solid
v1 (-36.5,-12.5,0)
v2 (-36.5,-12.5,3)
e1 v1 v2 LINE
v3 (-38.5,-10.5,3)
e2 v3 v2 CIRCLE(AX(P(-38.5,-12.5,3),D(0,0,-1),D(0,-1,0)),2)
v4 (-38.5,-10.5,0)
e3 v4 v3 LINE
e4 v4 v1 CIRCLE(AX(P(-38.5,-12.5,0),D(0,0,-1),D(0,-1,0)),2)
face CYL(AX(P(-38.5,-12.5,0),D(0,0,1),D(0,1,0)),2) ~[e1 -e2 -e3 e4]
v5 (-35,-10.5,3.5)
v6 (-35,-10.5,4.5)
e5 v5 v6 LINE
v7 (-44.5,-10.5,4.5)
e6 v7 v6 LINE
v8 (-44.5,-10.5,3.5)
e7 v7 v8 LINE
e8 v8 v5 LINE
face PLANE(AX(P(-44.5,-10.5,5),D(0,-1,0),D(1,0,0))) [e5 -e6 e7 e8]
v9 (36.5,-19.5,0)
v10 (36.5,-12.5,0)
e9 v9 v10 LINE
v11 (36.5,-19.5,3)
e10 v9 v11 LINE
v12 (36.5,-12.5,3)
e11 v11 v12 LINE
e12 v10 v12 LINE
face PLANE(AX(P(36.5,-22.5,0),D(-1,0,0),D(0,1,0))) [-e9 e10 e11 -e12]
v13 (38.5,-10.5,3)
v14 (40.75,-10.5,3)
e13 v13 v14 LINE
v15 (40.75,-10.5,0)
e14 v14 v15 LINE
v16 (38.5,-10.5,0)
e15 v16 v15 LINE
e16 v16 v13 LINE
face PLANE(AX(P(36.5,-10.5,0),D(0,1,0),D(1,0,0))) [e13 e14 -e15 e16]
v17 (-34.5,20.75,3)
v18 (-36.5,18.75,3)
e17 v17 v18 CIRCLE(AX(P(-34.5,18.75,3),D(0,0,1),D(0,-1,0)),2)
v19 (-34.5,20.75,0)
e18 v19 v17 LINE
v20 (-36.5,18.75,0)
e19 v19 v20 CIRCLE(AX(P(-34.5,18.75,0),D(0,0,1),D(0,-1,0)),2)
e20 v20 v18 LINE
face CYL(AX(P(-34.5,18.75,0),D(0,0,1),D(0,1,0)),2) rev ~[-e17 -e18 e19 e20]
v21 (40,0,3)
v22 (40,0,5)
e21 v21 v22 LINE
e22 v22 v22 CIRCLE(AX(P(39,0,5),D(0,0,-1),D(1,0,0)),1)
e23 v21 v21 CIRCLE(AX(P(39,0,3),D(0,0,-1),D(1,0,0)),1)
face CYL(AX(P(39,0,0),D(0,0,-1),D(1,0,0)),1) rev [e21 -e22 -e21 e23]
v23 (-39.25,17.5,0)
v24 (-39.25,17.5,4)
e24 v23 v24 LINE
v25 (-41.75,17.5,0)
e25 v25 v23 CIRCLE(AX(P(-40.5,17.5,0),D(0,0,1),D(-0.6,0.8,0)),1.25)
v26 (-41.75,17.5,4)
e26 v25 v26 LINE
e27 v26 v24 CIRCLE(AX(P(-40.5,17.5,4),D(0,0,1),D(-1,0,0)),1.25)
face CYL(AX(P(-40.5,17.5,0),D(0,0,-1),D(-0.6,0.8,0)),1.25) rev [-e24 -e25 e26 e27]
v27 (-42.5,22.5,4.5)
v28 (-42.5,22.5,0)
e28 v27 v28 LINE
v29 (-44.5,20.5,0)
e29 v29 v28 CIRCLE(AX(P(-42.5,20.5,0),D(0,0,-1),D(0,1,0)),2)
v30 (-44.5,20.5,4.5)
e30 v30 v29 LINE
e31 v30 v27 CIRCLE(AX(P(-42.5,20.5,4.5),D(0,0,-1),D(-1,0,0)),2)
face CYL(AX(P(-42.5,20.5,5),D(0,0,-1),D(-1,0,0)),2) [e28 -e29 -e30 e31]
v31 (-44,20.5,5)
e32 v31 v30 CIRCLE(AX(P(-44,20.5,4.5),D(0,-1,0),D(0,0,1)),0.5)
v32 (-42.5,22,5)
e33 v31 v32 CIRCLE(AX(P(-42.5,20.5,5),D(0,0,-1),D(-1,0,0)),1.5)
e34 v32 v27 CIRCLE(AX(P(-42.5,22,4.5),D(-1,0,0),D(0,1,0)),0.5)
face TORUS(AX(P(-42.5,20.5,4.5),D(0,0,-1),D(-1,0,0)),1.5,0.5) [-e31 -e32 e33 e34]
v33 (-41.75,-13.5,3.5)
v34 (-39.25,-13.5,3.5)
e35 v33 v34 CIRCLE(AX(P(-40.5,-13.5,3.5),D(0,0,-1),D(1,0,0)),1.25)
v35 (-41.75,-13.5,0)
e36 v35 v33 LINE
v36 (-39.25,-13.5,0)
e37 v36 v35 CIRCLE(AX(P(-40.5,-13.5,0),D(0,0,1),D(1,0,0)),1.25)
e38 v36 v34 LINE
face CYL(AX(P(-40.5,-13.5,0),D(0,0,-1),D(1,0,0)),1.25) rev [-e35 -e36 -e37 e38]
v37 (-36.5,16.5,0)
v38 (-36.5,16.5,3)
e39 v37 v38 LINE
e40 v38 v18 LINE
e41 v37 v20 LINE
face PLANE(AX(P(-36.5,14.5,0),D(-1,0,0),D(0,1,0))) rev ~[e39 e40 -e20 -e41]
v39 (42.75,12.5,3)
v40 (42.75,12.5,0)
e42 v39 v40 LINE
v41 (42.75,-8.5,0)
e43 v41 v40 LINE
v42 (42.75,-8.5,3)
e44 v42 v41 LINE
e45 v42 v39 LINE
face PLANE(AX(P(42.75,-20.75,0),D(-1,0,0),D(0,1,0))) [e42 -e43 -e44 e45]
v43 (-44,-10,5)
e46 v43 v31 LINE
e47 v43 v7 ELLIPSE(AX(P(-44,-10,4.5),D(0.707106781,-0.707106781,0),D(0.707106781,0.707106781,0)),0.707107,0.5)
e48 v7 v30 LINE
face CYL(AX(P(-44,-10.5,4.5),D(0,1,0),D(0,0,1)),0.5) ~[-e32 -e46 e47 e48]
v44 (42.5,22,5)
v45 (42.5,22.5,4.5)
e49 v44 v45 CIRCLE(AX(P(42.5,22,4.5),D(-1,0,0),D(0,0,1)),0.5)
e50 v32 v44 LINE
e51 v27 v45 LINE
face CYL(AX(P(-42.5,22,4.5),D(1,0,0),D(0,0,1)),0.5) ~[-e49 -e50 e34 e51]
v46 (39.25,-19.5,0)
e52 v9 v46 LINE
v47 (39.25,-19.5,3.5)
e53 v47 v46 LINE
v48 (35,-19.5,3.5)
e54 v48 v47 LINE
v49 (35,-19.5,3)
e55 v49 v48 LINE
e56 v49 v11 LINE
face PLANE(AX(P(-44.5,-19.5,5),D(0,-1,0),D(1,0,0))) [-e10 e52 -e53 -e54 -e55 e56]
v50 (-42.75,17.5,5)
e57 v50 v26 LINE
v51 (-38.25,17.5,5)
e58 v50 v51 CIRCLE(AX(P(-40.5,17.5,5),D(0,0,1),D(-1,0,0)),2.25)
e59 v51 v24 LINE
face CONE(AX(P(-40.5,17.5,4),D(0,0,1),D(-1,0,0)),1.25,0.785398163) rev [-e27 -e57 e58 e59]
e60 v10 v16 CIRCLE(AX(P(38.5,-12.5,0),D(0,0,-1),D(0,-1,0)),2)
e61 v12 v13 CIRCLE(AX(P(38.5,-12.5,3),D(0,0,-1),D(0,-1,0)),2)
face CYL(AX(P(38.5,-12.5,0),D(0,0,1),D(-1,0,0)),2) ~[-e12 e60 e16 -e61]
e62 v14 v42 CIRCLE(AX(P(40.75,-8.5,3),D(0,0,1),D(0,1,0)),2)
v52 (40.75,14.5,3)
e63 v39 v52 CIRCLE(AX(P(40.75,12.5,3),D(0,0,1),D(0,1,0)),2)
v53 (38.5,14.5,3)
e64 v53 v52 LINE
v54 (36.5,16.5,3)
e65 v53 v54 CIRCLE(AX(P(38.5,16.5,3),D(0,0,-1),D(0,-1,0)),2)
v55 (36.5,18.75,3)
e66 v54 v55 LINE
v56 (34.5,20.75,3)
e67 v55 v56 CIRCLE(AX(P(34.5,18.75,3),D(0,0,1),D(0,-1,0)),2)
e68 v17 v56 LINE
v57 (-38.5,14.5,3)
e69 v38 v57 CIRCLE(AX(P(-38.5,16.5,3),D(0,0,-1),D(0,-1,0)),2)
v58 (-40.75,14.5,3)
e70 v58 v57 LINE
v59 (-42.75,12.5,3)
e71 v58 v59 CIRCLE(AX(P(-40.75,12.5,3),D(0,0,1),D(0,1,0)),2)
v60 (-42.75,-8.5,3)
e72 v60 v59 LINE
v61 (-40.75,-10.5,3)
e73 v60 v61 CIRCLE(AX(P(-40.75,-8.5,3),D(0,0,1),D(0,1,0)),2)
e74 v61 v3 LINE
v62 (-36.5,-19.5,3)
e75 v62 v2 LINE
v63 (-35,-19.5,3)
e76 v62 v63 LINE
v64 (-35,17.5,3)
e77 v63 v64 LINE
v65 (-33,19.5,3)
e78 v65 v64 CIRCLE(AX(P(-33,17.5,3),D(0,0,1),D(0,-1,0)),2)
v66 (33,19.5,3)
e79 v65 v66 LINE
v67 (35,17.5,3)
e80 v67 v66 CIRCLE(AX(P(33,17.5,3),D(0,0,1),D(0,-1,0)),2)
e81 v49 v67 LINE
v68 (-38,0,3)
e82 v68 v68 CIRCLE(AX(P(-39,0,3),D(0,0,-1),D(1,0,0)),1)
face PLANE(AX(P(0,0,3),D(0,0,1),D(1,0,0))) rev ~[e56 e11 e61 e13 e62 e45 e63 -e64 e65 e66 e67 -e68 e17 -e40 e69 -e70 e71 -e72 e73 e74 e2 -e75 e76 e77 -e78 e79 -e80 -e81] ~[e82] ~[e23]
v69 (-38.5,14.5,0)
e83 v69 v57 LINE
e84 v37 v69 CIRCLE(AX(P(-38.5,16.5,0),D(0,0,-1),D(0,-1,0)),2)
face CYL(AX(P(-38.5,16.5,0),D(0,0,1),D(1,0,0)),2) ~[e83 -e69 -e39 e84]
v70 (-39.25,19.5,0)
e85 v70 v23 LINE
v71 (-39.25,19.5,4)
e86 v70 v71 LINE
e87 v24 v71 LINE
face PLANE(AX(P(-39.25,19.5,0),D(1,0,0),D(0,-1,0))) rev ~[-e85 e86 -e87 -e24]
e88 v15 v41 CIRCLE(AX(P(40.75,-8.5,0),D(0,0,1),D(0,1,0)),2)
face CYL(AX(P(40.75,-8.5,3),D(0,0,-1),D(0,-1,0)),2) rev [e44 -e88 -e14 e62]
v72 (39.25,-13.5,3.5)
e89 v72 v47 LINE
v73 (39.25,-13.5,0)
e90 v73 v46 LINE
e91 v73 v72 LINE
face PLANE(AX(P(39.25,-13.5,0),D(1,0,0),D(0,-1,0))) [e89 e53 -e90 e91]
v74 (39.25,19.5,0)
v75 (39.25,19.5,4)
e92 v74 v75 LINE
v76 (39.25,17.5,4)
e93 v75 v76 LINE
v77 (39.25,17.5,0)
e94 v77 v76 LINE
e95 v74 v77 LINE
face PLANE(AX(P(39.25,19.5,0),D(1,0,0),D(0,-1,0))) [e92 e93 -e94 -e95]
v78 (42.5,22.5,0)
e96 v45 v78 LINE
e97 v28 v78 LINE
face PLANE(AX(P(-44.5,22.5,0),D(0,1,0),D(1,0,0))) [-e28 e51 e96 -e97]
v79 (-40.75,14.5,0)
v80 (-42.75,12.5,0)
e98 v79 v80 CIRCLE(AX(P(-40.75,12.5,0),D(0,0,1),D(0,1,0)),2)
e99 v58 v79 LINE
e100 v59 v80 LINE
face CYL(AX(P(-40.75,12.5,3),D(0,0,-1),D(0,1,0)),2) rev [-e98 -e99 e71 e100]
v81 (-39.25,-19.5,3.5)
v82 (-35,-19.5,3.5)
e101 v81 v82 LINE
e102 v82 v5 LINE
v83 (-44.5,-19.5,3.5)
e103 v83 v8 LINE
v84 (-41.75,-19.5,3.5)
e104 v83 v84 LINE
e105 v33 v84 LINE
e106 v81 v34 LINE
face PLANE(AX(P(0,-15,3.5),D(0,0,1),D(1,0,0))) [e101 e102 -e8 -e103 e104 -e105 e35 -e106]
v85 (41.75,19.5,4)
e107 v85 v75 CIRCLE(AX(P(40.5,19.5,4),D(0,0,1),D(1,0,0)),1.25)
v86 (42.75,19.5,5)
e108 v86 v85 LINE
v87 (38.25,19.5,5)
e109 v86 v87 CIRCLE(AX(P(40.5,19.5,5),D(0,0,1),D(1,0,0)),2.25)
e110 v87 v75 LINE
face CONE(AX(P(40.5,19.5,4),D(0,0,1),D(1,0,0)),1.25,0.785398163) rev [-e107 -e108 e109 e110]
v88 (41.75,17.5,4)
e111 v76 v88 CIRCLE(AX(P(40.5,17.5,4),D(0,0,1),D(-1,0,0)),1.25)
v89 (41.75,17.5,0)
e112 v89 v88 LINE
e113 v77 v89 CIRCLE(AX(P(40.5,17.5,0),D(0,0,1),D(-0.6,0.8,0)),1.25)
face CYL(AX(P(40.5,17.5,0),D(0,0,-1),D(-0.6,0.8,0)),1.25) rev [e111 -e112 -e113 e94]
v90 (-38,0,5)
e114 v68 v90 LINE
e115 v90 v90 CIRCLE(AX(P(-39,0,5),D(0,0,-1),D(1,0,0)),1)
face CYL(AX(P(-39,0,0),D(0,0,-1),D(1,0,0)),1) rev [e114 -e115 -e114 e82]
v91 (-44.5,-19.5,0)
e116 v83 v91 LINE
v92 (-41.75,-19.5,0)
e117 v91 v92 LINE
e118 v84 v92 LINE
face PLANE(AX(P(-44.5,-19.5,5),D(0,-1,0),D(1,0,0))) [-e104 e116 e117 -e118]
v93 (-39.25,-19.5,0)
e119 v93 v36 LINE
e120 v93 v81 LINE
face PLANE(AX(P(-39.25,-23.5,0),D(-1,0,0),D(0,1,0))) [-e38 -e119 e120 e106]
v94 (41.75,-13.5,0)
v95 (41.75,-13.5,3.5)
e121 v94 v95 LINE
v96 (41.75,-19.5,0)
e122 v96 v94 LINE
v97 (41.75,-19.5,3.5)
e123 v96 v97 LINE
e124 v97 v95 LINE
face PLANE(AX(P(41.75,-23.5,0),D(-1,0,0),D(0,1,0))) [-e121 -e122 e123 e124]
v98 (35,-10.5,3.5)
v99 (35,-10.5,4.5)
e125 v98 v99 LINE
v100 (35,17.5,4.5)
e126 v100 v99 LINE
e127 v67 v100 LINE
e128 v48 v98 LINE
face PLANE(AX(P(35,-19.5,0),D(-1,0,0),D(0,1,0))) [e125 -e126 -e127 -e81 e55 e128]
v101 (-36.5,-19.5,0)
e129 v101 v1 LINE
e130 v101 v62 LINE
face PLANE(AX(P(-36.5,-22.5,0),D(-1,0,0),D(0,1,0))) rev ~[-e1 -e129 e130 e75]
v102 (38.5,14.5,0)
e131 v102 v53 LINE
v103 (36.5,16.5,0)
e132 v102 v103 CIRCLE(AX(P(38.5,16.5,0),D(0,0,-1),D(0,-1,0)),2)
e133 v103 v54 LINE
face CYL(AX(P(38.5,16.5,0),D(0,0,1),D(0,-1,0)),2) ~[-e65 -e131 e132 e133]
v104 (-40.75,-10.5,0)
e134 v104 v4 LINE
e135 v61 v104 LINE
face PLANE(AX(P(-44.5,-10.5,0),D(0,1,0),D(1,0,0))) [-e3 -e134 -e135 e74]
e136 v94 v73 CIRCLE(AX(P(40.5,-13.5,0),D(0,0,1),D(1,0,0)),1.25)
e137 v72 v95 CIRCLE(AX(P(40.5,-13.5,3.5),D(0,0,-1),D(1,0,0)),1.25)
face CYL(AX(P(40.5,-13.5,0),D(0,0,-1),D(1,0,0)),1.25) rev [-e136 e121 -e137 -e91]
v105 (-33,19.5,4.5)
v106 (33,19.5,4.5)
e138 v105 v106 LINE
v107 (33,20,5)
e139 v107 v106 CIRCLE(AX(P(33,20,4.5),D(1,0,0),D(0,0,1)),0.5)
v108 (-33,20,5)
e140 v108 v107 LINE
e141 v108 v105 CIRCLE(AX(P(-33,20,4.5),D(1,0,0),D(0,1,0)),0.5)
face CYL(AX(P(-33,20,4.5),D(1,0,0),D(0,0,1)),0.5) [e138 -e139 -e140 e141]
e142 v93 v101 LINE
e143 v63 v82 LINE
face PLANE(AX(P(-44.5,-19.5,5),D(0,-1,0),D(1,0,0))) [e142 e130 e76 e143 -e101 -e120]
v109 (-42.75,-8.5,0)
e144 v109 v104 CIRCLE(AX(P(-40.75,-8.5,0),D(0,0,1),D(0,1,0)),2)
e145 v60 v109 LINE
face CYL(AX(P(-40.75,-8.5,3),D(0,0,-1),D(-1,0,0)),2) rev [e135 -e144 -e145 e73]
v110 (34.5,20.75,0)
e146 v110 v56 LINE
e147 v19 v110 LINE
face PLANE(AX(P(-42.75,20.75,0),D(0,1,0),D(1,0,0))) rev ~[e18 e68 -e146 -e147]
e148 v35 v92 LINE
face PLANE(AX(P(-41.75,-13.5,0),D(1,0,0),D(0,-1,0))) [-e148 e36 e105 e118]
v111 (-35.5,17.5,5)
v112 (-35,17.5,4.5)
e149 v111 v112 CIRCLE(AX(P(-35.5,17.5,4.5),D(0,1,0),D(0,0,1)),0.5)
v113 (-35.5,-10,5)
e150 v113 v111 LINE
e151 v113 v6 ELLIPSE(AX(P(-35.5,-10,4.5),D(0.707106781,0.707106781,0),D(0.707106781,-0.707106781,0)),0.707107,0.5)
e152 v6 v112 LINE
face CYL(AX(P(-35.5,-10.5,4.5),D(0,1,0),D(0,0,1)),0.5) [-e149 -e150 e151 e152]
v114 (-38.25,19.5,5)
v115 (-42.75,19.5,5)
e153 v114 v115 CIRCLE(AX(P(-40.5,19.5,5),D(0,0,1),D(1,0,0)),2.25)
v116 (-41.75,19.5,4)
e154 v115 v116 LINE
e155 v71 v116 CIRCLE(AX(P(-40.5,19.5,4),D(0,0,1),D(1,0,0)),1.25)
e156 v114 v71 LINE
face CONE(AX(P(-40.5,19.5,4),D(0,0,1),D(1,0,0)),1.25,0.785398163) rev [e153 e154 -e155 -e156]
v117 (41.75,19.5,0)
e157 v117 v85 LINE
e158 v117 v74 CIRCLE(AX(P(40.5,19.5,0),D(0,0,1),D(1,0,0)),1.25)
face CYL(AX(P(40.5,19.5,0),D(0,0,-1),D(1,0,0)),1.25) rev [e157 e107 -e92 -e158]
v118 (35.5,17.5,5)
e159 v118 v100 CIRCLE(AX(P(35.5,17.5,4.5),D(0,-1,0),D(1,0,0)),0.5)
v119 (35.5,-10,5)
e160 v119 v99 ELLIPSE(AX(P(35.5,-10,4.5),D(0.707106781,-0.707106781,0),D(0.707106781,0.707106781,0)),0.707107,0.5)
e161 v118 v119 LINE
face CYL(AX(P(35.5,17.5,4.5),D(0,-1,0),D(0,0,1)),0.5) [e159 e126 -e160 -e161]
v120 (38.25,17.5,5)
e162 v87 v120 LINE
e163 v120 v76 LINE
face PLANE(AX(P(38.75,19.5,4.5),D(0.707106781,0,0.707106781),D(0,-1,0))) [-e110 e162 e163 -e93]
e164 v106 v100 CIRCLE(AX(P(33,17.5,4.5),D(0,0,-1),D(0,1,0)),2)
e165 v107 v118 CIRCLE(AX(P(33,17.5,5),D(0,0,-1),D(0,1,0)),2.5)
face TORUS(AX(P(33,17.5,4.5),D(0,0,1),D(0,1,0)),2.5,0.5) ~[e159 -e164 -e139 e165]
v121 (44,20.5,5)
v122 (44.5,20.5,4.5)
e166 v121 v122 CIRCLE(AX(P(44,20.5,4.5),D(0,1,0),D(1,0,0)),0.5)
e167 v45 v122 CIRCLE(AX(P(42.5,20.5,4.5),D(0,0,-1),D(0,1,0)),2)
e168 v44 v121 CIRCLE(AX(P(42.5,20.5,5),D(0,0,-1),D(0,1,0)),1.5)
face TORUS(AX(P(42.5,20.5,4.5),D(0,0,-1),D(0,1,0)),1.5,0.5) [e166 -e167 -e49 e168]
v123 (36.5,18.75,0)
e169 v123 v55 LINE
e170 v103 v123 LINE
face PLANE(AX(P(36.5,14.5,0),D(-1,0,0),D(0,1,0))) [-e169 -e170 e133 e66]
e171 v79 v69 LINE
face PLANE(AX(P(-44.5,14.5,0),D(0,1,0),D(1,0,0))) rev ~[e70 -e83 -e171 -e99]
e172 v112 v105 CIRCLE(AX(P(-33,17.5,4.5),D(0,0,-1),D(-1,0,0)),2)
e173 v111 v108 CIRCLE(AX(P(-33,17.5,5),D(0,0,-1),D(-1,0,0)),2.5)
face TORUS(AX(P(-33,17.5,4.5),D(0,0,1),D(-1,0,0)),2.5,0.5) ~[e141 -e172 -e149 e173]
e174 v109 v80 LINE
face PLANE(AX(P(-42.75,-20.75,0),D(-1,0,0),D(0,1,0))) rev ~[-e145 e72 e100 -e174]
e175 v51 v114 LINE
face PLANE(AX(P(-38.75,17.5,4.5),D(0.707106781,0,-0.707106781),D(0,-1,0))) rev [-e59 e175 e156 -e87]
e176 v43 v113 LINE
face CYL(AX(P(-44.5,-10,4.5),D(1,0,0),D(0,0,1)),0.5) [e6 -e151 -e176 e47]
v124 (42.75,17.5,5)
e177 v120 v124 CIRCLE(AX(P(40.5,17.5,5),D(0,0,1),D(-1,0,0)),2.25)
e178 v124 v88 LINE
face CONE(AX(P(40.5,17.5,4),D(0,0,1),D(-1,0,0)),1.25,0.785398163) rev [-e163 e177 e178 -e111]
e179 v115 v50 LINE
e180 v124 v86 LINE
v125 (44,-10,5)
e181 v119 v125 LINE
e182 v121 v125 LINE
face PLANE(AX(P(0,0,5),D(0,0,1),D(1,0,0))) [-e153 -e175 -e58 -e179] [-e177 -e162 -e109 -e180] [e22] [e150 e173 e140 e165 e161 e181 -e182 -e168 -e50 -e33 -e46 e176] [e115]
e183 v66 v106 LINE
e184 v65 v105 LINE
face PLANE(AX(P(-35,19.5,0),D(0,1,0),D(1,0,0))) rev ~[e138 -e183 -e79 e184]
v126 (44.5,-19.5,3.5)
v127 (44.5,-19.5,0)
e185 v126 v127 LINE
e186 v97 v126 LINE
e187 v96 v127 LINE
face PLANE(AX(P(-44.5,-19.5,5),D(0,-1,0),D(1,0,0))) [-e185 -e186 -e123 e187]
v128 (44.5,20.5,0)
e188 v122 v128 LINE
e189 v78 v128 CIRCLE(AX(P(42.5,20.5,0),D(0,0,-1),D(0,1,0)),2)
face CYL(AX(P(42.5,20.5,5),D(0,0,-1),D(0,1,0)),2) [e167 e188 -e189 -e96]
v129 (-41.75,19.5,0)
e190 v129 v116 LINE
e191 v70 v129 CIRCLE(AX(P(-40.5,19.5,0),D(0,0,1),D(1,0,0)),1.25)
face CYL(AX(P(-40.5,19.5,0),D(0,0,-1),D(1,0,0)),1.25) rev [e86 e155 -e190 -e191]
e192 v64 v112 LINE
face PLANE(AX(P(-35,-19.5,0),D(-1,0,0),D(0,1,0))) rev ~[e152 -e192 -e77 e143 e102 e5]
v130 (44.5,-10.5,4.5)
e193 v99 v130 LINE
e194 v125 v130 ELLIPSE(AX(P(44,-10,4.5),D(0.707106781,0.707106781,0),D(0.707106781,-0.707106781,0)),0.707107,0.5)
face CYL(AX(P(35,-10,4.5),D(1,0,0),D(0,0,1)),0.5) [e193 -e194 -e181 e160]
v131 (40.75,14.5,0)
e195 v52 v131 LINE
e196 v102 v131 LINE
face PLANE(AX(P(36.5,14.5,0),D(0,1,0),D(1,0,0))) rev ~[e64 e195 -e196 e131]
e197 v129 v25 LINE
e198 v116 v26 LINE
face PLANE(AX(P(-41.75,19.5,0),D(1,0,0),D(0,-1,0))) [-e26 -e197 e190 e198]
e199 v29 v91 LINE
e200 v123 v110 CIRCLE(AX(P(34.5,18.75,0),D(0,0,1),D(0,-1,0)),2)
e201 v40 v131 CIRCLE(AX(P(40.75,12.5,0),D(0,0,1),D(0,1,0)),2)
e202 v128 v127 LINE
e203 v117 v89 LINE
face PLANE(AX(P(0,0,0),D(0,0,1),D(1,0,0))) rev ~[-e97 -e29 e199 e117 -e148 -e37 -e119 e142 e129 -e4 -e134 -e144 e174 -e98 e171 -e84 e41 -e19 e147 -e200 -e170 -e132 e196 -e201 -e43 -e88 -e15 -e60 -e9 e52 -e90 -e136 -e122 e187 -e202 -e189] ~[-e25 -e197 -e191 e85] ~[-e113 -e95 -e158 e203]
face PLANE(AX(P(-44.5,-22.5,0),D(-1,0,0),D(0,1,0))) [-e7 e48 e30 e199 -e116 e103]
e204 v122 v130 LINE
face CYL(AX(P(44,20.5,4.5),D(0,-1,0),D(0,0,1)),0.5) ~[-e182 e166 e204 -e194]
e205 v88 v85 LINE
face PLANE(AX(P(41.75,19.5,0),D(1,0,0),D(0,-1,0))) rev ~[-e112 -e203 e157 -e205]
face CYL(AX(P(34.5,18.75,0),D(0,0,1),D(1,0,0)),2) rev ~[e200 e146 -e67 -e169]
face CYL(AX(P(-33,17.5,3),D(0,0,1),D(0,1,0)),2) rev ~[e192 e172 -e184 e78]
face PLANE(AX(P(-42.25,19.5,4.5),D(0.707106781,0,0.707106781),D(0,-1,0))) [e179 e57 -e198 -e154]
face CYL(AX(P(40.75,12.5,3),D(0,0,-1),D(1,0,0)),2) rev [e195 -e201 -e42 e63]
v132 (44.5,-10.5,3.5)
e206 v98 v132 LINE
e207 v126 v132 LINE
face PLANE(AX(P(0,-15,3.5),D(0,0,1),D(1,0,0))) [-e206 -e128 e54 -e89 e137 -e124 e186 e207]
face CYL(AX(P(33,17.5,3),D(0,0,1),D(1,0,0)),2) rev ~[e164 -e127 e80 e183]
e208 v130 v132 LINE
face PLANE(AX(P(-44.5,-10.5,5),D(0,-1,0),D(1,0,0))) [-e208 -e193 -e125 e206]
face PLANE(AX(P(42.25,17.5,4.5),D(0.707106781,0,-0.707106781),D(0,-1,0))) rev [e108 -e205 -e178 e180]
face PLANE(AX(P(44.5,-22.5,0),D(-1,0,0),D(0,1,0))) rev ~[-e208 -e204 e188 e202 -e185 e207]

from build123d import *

# Parameters (mm, degrees)
F0_W      = 89
F0_H      = 45
F1_DEPTH  = 5
F2_W      = 70
F2_H      = 39
F3_DEPTH  = 25
F4_W      = 85.5
F4_H      = 41.5
F5_DEPTH  = 3
F6_W      = 8
F6_H      = 8
F6_H_2    = 12
F7_DEPTH  = 3
F8_R      = 1
F9_DEPTH  = 25
F10_DEPTH = 25
F11_W     = 2.5
F11_H     = 2
F12_DEPTH = 25
F13_W     = 89
F13_H     = 3
F14_DEPTH = 25
F15_W     = 89
F15_H     = 9
F16_DEPTH = 1.5
F17_SIZE  = 1
F18_SIZE  = 1
F19_R     = 2
F20_R     = 0.5


with BuildPart() as f1:
    # F0 (on Top) → F1 (new body)
    with BuildSketch(Plane.XY):
        Rectangle(F0_W, F0_H)
    extrude(amount=F1_DEPTH)

    # F2 (on Top) → F3 (cut)
    with BuildSketch(Plane.XY):
        Rectangle(F2_W, F2_H)
    extrude(amount=F3_DEPTH, mode=Mode.SUBTRACT)

    # F4 (on Top) → F5 (cut)
    with BuildSketch(Plane.XY):
        Rectangle(F4_W, F4_H)
    extrude(amount=F5_DEPTH, mode=Mode.SUBTRACT)

    # F6 (on Top) → F7 (join)
    with BuildSketch(Plane.XY):
        with Locations((-40.5, 18.5)):
            Rectangle(F6_W, F6_H)
        with Locations((-40.5, -16.5)):
            Rectangle(F6_W, F6_H_2)
        with Locations((40.5, 18.5)):
            Rectangle(F6_W, F6_H)
        with Locations((40.5, -16.5)):
            Rectangle(F6_W, F6_H_2)
    extrude(amount=F7_DEPTH)

    # F8 (on Top) → F9 (cut)
    with BuildSketch(Plane.XY):
        with BuildLine():
            Line((39.25, -13.5), (41.75, -13.5))
            ThreePointArc((41.75, -13.5), (40.5, -12.25), (39.25, -13.5))
        make_face()
        with BuildLine():
            Line((41.75, -23.5), (41.75, -13.5))
            ThreePointArc((41.75, -13.5), (40.5, -14.75), (39.25, -13.5))
            Line((39.25, -13.5), (39.25, -23.5))
            Line((39.25, -23.5), (41.75, -23.5))
        make_face()
        with BuildLine():
            ThreePointArc((39.25, -13.5), (40.5, -14.75), (41.75, -13.5))
            Line((41.75, -13.5), (39.25, -13.5))
        make_face()
        with BuildLine():
            ThreePointArc((41.25, 18.5), (41.6180339887, 18.9409830056), (41.75, 19.5))
            ThreePointArc((41.75, 19.5), (39.9409830056, 20.6180339887), (39.75, 18.5))
            ThreePointArc((39.75, 18.5), (40.5, 18.75), (41.25, 18.5))
        make_face()
        with BuildLine():
            ThreePointArc((41.25, 18.5), (40.5, 18.75), (39.75, 18.5))
            ThreePointArc((39.75, 18.5), (40.5, 18.25), (41.25, 18.5))
        make_face()
        with BuildLine():
            ThreePointArc((41.25, 18.5), (40.5, 18.25), (39.75, 18.5))
            ThreePointArc((39.75, 18.5), (39.9409830056, 16.3819660113), (41.75, 17.5))
            ThreePointArc((41.75, 17.5), (41.6180339887, 18.0590169944), (41.25, 18.5))
        make_face()
        with BuildLine():
            Line((-41.75, -13.5), (-39.25, -13.5))
            ThreePointArc((-39.25, -13.5), (-40.5, -12.25), (-41.75, -13.5))
        make_face()
        with BuildLine():
            Line((-39.25, -23.5), (-39.25, -13.5))
            ThreePointArc((-39.25, -13.5), (-40.5, -14.75), (-41.75, -13.5))
            Line((-41.75, -13.5), (-41.75, -23.5))
            Line((-41.75, -23.5), (-39.25, -23.5))
        make_face()
        with BuildLine():
            ThreePointArc((-41.75, -13.5), (-40.5, -14.75), (-39.25, -13.5))
            Line((-39.25, -13.5), (-41.75, -13.5))
        make_face()
        with BuildLine():
            ThreePointArc((-39.75, 18.5), (-39.3819660113, 18.9409830056), (-39.25, 19.5))
            ThreePointArc((-39.25, 19.5), (-41.0590169944, 20.6180339887), (-41.25, 18.5))
            ThreePointArc((-41.25, 18.5), (-40.5, 18.75), (-39.75, 18.5))
        make_face()
        with BuildLine():
            ThreePointArc((-39.75, 18.5), (-40.5, 18.75), (-41.25, 18.5))
            ThreePointArc((-41.25, 18.5), (-40.5, 18.25), (-39.75, 18.5))
        make_face()
        with BuildLine():
            ThreePointArc((-39.75, 18.5), (-40.5, 18.25), (-41.25, 18.5))
            ThreePointArc((-41.25, 18.5), (-41.0590169944, 16.3819660113), (-39.25, 17.5))
            ThreePointArc((-39.25, 17.5), (-39.3819660113, 18.0590169944), (-39.75, 18.5))
        make_face()
        with Locations((-39, 0)):
            Circle(F8_R)
        with Locations((39, 0)):
            Circle(F8_R)
    extrude(amount=F9_DEPTH, mode=Mode.SUBTRACT)

    # F8 (on Top) → F10 (cut)
    with BuildSketch(Plane.XY):
        with BuildLine():
            Line((39.25, -13.5), (41.75, -13.5))
            ThreePointArc((41.75, -13.5), (40.5, -12.25), (39.25, -13.5))
        make_face()
        with BuildLine():
            Line((41.75, -23.5), (41.75, -13.5))
            ThreePointArc((41.75, -13.5), (40.5, -14.75), (39.25, -13.5))
            Line((39.25, -13.5), (39.25, -23.5))
            Line((39.25, -23.5), (41.75, -23.5))
        make_face()
        with BuildLine():
            ThreePointArc((39.25, -13.5), (40.5, -14.75), (41.75, -13.5))
            Line((41.75, -13.5), (39.25, -13.5))
        make_face()
        with BuildLine():
            ThreePointArc((41.25, 18.5), (41.6180339887, 18.9409830056), (41.75, 19.5))
            ThreePointArc((41.75, 19.5), (39.9409830056, 20.6180339887), (39.75, 18.5))
            ThreePointArc((39.75, 18.5), (40.5, 18.75), (41.25, 18.5))
        make_face()
        with BuildLine():
            ThreePointArc((41.25, 18.5), (40.5, 18.75), (39.75, 18.5))
            ThreePointArc((39.75, 18.5), (40.5, 18.25), (41.25, 18.5))
        make_face()
        with BuildLine():
            ThreePointArc((41.25, 18.5), (40.5, 18.25), (39.75, 18.5))
            ThreePointArc((39.75, 18.5), (39.9409830056, 16.3819660113), (41.75, 17.5))
            ThreePointArc((41.75, 17.5), (41.6180339887, 18.0590169944), (41.25, 18.5))
        make_face()
        with BuildLine():
            Line((-41.75, -13.5), (-39.25, -13.5))
            ThreePointArc((-39.25, -13.5), (-40.5, -12.25), (-41.75, -13.5))
        make_face()
        with BuildLine():
            Line((-39.25, -23.5), (-39.25, -13.5))
            ThreePointArc((-39.25, -13.5), (-40.5, -14.75), (-41.75, -13.5))
            Line((-41.75, -13.5), (-41.75, -23.5))
            Line((-41.75, -23.5), (-39.25, -23.5))
        make_face()
        with BuildLine():
            ThreePointArc((-41.75, -13.5), (-40.5, -14.75), (-39.25, -13.5))
            Line((-39.25, -13.5), (-41.75, -13.5))
        make_face()
        with BuildLine():
            ThreePointArc((-39.75, 18.5), (-39.3819660113, 18.9409830056), (-39.25, 19.5))
            ThreePointArc((-39.25, 19.5), (-41.0590169944, 20.6180339887), (-41.25, 18.5))
            ThreePointArc((-41.25, 18.5), (-40.5, 18.75), (-39.75, 18.5))
        make_face()
        with BuildLine():
            ThreePointArc((-39.75, 18.5), (-40.5, 18.75), (-41.25, 18.5))
            ThreePointArc((-41.25, 18.5), (-40.5, 18.25), (-39.75, 18.5))
        make_face()
        with BuildLine():
            ThreePointArc((-39.75, 18.5), (-40.5, 18.25), (-41.25, 18.5))
            ThreePointArc((-41.25, 18.5), (-41.0590169944, 16.3819660113), (-39.25, 17.5))
            ThreePointArc((-39.25, 17.5), (-39.3819660113, 18.0590169944), (-39.75, 18.5))
        make_face()
        with Locations((-39, 0)):
            Circle(F8_R)
        with Locations((39, 0)):
            Circle(F8_R)
    extrude(amount=F10_DEPTH, mode=Mode.SUBTRACT)

    # F11 (on face) → F12 (cut)
    with BuildSketch(Plane(origin=(0, 0, 0), x_dir=(1, 0, 0), z_dir=(0, 0, -1))):
        with Locations((-40.5, -18.5)):
            Rectangle(F11_W, F11_H)
        with Locations((40.5, -18.5)):
            Rectangle(F11_W, F11_H)
    extrude(amount=-F12_DEPTH, mode=Mode.SUBTRACT)

    # F13 (on face) → F14 (cut)
    with BuildSketch(Plane.XY.offset(5)):
        with Locations((0, -21)):
            Rectangle(F13_W, F13_H)
    extrude(amount=-F14_DEPTH, mode=Mode.SUBTRACT)

    # F15 (on face) → F16 (cut)
    with BuildSketch(Plane.XY.offset(5)):
        with Locations((0, -15)):
            Rectangle(F15_W, F15_H)
    extrude(amount=-F16_DEPTH, mode=Mode.SUBTRACT)

    # F17
    f17_edges = [f1.edges().sort_by_distance(p)[0] for p in [
        (41.75, 18.5, 5),
    ]]
    chamfer(f17_edges, length=F17_SIZE)

    # F18
    f18_edges = [f1.edges().sort_by_distance(p)[0] for p in [
        (-39.25, 18.5, 5),
    ]]
    chamfer(f18_edges, length=F18_SIZE)

    # F19
    f19_edges = [f1.edges().sort_by_distance(p)[0] for p in [
        (-44.5, 22.5, 2.5),
        (44.5, 22.5, 2.5),
        (35, 19.5, 4),
        (-35, 19.5, 4),
        (-36.5, 14.5, 1.5),
        (-36.5, 20.75, 1.5),
        (-42.75, 14.5, 1.5),
        (-42.75, -10.5, 1.5),
        (-36.5, -10.5, 1.5),
        (36.5, 20.75, 1.5),
        (36.5, 14.5, 1.5),
        (42.75, 14.5, 1.5),
        (42.75, -10.5, 1.5),
        (36.5, -10.5, 1.5),
    ]]
    fillet(f19_edges, radius=F19_R)

    # F20
    f20_edges = [f1.edges().sort_by_distance(p)[0] for p in [
        (0, 22.5, 5),
        (-39.75, -10.5, 5),
        (39.75, -10.5, 5),
        (35, 3.5, 5),
    ]]
    fillet(f20_edges, radius=F20_R)


solid = f1.part
